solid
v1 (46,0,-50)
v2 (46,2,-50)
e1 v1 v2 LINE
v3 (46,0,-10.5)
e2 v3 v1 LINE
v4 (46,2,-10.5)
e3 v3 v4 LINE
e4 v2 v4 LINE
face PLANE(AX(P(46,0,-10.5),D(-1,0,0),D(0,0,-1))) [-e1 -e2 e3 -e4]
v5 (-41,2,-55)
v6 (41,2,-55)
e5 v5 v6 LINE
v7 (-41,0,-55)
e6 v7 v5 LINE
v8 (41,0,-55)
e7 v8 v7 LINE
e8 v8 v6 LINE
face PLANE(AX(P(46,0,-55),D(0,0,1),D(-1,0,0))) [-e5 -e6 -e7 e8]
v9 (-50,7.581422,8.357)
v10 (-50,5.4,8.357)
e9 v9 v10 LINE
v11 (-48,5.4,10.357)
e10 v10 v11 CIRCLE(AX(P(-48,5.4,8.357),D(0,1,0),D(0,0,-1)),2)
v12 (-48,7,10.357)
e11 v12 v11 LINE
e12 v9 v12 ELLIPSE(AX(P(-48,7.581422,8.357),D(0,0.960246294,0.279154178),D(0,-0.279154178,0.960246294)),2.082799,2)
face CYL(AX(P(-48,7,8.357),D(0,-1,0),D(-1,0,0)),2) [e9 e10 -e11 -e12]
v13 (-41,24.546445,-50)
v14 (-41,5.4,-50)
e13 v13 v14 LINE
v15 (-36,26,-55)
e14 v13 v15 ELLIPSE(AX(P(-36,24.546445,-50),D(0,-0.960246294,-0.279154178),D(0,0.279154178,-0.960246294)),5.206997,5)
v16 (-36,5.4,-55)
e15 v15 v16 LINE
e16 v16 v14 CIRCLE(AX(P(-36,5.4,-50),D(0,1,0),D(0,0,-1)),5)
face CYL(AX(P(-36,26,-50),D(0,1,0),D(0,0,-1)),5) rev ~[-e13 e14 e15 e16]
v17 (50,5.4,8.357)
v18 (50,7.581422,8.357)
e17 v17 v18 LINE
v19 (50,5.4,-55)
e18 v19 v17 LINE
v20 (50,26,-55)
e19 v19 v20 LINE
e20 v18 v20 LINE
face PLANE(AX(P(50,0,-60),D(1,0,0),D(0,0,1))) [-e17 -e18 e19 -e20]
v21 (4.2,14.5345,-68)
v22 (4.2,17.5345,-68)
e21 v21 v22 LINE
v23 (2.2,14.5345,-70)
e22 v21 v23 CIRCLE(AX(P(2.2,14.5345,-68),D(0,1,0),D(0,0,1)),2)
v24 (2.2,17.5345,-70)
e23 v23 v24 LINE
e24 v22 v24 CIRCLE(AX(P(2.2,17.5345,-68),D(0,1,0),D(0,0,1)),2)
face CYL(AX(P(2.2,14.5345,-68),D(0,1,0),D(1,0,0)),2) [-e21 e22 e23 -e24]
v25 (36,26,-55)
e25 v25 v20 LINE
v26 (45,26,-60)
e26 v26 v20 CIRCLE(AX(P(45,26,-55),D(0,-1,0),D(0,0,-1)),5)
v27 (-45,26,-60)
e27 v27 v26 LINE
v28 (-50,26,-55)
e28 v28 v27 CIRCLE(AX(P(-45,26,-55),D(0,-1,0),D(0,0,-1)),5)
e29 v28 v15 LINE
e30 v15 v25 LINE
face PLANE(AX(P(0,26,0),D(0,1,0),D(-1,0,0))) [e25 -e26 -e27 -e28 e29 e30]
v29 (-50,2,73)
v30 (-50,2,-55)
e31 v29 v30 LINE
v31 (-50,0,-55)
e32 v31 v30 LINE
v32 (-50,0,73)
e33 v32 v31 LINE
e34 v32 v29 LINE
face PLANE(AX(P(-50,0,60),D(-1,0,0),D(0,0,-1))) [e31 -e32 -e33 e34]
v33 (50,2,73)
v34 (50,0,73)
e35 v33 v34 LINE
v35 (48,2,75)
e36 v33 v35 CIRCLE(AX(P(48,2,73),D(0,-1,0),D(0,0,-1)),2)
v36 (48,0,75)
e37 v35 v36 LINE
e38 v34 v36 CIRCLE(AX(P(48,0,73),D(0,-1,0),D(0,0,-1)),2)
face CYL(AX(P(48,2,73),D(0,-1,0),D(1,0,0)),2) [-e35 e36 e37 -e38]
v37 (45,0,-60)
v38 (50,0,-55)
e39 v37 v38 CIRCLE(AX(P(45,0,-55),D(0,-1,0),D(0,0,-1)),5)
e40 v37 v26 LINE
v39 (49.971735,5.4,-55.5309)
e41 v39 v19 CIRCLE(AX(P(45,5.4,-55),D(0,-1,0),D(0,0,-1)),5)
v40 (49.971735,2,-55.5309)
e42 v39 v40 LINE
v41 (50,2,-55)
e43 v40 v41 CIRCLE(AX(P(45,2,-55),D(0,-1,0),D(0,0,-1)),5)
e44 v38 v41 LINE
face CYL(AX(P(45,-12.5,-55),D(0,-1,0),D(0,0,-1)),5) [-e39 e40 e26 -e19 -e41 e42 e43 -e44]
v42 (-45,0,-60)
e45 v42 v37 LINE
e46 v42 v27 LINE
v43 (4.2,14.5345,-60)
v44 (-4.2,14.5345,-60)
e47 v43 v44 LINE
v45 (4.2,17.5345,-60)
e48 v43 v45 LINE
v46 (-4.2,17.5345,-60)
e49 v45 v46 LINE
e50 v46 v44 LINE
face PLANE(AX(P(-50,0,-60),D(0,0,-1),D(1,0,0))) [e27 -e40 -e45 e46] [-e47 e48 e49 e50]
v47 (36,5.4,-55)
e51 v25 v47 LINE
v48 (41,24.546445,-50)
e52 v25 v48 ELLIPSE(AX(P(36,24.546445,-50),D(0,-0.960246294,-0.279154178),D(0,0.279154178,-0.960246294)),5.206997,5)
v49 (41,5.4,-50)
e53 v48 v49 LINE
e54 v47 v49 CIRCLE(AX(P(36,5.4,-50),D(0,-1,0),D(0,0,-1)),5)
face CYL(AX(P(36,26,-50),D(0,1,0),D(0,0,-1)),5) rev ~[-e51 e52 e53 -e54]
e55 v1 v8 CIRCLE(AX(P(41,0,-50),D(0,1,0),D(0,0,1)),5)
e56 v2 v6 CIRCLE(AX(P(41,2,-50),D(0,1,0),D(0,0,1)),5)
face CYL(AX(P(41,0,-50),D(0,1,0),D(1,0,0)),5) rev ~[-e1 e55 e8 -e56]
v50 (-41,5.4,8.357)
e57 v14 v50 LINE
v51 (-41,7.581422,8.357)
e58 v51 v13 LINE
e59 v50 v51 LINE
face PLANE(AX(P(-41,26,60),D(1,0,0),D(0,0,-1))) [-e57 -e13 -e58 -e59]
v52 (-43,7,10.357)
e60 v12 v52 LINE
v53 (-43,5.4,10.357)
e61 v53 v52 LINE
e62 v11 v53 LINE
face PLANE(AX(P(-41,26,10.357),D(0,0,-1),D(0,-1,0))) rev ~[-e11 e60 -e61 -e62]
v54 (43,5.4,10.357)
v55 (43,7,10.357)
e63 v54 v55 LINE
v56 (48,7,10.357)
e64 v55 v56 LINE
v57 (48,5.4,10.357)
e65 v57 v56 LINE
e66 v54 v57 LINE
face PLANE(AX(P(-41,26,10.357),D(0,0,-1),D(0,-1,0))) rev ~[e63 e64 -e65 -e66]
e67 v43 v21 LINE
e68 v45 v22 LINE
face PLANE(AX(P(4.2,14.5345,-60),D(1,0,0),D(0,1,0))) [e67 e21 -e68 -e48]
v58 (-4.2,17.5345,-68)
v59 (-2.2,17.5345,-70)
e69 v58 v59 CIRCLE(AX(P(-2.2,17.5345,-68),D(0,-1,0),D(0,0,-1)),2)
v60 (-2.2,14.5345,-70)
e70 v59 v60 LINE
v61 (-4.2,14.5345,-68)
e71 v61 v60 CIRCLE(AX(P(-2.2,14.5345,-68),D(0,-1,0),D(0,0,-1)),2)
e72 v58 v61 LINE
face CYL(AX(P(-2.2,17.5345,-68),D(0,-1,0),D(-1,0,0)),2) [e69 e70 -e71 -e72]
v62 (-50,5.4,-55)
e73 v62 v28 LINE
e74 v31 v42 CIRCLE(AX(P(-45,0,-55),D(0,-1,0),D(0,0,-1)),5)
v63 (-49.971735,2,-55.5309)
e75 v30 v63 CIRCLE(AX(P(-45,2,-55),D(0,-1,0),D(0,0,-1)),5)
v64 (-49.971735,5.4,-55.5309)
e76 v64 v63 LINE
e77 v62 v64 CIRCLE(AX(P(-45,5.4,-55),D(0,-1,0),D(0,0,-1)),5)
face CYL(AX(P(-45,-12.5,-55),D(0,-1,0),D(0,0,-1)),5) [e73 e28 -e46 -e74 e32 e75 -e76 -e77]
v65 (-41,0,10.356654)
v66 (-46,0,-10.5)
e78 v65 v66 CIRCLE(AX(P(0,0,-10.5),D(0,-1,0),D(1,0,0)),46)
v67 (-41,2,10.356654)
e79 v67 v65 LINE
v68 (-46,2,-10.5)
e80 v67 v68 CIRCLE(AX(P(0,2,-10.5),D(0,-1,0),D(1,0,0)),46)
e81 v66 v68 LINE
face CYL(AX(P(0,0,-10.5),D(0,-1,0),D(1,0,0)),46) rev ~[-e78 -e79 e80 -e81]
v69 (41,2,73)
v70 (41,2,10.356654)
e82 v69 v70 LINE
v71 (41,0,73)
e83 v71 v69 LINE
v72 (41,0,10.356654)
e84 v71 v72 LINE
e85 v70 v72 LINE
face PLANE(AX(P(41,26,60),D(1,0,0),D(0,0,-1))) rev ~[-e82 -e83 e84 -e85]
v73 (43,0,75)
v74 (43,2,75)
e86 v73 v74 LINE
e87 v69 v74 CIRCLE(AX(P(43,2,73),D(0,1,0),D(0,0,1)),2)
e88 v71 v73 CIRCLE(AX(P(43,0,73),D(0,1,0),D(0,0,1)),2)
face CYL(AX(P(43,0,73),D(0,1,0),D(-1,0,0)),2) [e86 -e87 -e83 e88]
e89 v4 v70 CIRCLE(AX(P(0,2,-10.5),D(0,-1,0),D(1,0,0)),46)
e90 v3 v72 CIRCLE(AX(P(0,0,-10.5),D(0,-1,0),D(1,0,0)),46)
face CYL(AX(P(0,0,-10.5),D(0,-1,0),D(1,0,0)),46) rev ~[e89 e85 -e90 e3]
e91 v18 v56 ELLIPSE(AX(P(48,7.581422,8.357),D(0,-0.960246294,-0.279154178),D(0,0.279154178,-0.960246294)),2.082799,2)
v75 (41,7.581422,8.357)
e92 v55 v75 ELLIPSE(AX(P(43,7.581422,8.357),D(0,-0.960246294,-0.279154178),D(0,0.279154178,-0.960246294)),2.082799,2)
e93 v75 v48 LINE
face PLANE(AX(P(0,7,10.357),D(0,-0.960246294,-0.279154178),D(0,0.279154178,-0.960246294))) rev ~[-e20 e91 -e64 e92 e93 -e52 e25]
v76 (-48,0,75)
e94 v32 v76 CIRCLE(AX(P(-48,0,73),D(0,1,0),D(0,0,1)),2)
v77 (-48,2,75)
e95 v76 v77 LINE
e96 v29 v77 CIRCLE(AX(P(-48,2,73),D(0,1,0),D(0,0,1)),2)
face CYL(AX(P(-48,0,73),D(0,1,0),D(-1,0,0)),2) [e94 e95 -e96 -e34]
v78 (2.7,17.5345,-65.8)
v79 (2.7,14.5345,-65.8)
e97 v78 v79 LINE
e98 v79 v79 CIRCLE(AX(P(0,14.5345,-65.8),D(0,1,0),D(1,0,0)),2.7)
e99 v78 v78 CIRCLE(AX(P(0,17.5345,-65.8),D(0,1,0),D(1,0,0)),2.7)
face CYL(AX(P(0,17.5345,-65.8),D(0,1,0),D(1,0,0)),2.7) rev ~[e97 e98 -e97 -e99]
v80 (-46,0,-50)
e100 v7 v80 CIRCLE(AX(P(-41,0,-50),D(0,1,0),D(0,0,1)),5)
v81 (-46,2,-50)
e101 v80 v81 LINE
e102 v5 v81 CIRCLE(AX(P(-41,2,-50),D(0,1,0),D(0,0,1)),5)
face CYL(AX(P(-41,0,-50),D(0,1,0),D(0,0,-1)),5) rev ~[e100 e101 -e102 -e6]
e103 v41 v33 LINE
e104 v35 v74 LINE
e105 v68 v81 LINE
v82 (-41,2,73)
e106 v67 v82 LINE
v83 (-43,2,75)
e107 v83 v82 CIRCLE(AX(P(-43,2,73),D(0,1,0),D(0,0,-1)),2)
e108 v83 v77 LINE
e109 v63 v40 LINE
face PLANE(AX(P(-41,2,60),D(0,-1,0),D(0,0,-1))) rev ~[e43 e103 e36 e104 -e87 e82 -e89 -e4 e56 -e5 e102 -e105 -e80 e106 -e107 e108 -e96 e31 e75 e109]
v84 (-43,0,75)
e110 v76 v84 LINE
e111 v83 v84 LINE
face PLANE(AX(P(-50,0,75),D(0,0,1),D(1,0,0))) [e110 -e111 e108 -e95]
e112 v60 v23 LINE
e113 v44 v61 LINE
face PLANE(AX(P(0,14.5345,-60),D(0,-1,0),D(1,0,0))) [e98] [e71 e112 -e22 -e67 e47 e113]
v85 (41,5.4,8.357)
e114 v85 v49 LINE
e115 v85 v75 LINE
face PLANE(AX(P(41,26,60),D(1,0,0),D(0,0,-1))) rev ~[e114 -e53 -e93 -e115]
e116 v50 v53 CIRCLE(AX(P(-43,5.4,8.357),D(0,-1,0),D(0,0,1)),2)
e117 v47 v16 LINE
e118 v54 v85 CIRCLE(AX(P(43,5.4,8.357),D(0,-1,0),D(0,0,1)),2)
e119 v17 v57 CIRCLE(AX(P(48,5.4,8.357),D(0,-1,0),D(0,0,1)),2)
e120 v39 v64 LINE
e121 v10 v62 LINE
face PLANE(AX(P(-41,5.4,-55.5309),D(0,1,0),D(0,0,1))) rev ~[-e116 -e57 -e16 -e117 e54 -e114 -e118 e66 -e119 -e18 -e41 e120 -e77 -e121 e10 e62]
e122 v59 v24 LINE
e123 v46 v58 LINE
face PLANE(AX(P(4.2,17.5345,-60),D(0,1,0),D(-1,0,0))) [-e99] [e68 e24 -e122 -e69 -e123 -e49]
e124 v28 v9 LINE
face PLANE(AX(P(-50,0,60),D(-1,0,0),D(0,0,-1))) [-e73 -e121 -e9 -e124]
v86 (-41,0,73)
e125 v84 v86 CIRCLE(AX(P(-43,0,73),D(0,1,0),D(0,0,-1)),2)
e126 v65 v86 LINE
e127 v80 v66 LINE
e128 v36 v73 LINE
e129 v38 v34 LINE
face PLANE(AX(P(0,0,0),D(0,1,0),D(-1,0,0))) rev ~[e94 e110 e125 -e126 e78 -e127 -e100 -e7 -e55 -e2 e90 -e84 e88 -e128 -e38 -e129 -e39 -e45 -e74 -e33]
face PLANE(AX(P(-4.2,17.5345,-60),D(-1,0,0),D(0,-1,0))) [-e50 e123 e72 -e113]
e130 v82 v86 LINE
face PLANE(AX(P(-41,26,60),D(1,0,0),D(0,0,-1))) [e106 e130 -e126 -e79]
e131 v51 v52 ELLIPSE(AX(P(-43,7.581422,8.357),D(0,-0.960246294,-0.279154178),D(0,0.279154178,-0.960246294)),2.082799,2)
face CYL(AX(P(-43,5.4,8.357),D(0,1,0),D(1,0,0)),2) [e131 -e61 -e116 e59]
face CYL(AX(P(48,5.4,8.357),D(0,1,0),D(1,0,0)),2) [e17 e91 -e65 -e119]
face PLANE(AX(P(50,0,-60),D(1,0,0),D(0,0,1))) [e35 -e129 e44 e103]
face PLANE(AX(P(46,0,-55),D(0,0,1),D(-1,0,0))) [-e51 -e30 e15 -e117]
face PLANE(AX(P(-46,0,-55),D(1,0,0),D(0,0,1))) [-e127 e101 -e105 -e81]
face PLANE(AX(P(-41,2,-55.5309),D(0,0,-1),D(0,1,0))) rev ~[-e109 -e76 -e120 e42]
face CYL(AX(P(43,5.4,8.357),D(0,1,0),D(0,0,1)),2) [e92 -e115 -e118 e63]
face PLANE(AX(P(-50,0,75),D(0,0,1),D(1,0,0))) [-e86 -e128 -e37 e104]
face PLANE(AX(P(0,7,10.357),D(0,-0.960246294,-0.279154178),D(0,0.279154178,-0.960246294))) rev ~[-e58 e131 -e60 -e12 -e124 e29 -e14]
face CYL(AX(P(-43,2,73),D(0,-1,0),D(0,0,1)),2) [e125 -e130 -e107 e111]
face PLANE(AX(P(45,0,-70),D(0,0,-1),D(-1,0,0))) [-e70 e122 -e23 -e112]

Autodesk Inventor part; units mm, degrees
ref_plane "YZ Plane" through (0, 0, 0) normal (1, 0, 0) x (0, 1, 0)
ref_plane "XZ Plane" through (0, 0, 0) normal (0, 1, 0) x (-1, 0, 0)
ref_plane "XY Plane" through (0, 0, 0) normal (0, 0, 1) x (1, 0, 0)
sketch "Sketch1" plane through (0, 0, 0) normal (0, 1, 0) x (-1, 0, 0)
  line L0 (50, -60) -> (-50, -60)
  line L1 (-50, -60) -> (-50, 60)
  line L2 (-50, 60) -> (50, 60)
  line L3 (50, 60) -> (50, -60)
  line L4 (50, -60) -> (-50, 60) construction
  line L5 (-50, -60) -> (50, 60) construction
  point P0 (0, 0)
  dimension "d0" = 100
  dimension "d1" = 120
extrude "Extrusion1" add sketch "Sketch1" along normal blind 26
sketch "Sketch2" plane through (0, 26, 0) normal (0, 1, 0) x (1, 0, 0)
  line L0 (-41, -60) -> (41, -60)
  line L1 (-50, -60) -> (50, -60) projected
  line L2 (41, -60) -> (41, -4.7988)
  line L3 (50, 60) -> (-50, 60) projected
  line L4 (-41, -60) -> (-41, 55)
  line L5 (-41, 55) -> (41, 55)
  line L6 (41, 55) -> (41, -4.7988)
  point P0 (0, 0)
  dimension "d23" = 115
extrude "Extrusion2" cut sketch "Sketch2" against normal through all
sketch "Sketch11" plane through (0, 0, 0) normal (0, -1, 0) x (1, 0, 0)
  arc A0 (46, -10.5) -> (-46, -10.5) centre (0, -10.5) ccw
  line L0 (41, -55) -> (-41, -55) projected
  line L1 (-46, -10.5) -> (46, -10.5)
  line L2 (46, -10.5) -> (46, -55)
  line L3 (46, -55) -> (-46, -55)
  line L4 (-46, -55) -> (-46, -10.5)
  point P0 (0, 0)
  dimension "d24" = 92
  dimension "d25" = 44.5
extrude "Extrusion7" cut sketch "Sketch11" against normal blind 5.4
sketch "Sketch13" plane through (-41, 26, 60) normal (1, 0, 0) x (0, 0, -1)
  line L0 (0, -26) -> (0, 0) projected
  line L1 (0, -24) -> (115.5309, -24)
  line L2 (115.5309, -24) -> (115.5309, -20.6)
  line L3 (115.5309, -20.6) -> (0, -20.6)
  line L4 (0, -20.6) -> (0, -24)
  line L5 (49.6433, -26) -> (0, -26) projected
  point P0 (60, -26)
  point P1 (0, -20.6)
  dimension "d48" = 115.5309
  dimension "d49" = 3.4
  dimension "d50" = 2
extrude "Extrusion8" cut sketch "Sketch13" against normal through all both and the other way through all
sketch "Sketch14" plane through (-41, 26, 60) normal (1, 0, 0) x (0, 0, -1)
  line L0 (0, -20.6) -> (0, 0) projected
  line L1 (0, 0) -> (49.643, 0)
  line L2 (49.643, 0) -> (49.643, -20.6)
  line L3 (49.643, -20.6) -> (0, -20.6)
  line L4 (0, -20.6) -> (0, 0)
  point P0 (60, -26)
  dimension "d51" = 20.6
  dimension "d52" = 49.643
extrude "Extrusion9" cut sketch "Sketch14" along normal through all both and the other way through all
sketch "Sketch15" plane through (0, 0, 0) normal (1, 0, 0) x (0, 1, 0)
  line L0 (26, -55) -> (5.4, -55) projected
  line L1 (7, 10.357) -> (26, -55)
  line L2 (26, -55) -> (26, 10.357)
  line L3 (26, 10.357) -> (7, 10.357)
  point P0 (0, 0)
  dimension "d53" = 65.357
  dimension "d54" = 19
extrude "Extrusion10" cut sketch "Sketch15" against normal through all both and the other way through all
fillet "Fillet1" radius 5 4 edges at (-41, 15.7, -55) (50, 13, -60) (-50, 13, -60) (41, 15.7, -55)
fillet "Fillet2" radius 5 2 edges at (-46, 1, -55) (46, 1, -55)
sketch "Sketch16" plane through (45, 0, -60) normal (0, 0, -1) x (-1, 0, 0)
  line L0 (45, 0) -> (45, 26)
  line L1 (81, 26) -> (9, 26) projected
  line L2 (40.8, 17.5345) -> (49.2, 17.5345)
  line L3 (49.2, 17.5345) -> (49.2, 14.5345)
  line L4 (49.2, 14.5345) -> (40.8, 14.5345)
  line L5 (40.8, 14.5345) -> (40.8, 17.5345)
  line L6 (40.8, 17.5345) -> (49.2, 14.5345) construction
  line L7 (49.2, 17.5345) -> (40.8, 14.5345) construction
  point P0 (45, 16.0345)
  dimension "d38" = 8.4
  dimension "d39" = 3
extrude "Extrusion11" add sketch "Sketch16" along normal blind 10
sketch "Sketch17" plane through (-4.2, 17.5345, -60) normal (0, 1, 0) x (1, 0, 0)
  circle A0 centre (4.2, 5.8) radius 2.7
  line L0 (0, 0) -> (0, 10) projected
  line L1 (0, 10) -> (8.4, 10) projected
  point P0 (4.2, -60)
  dimension "d42" = 5.4
  dimension "d43" = 4.2
  dimension "d44" = 4.2
extrude "Extrusion12" cut sketch "Sketch17" against normal through all
fillet "Fillet5" radius 2 2 edges at (-4.2, 16.0345, -70) (4.2, 16.0345, -70)
sketch "Sketch18" plane through (45, 0, -60) normal (0, 0, -1) x (-1, 0, 0)
  point P0 (45, 0)
sketch "Sketch19" plane through (-50, 5.4, -55) normal (-1, 0, 0) x (0, 0, 1)
  point P0 (55, -5.4)
sketch "Sketch20" plane through (-50, 0, 60) normal (0, 0, 1) x (1, 0, 0)
  line L0 (9, 2) -> (0, 2) projected
  line L1 (0, 0) -> (9, 0) projected
  line L2 (0, 2) -> (9, 2)
  line L3 (9, 2) -> (9, 0)
  line L4 (9, 0) -> (0, 0)
  line L5 (0, 0) -> (0, 2)
  line L6 (100, 0) -> (95, 0) projected
  line L7 (100, 2) -> (91, 2) projected
  line L8 (100, 0) -> (91, 0)
  line L9 (91, 0) -> (91, 2)
  line L10 (91, 2) -> (100, 2)
  line L11 (100, 2) -> (100, 0)
  point P0 (50, 0)
extrude "Extrusion13" add sketch "Sketch20" along normal blind 15
fillet "Fillet7" radius 2 4 edges at (-41, 6.2, 10.357) (-50, 6.2, 10.357) (50, 6.2, 10.357) (41, 6.2, 10.357)
fillet "Fillet8" radius 2 4 edges at (50, 1, 75) (41, 1, 75) (-41, 1, 75) (-50, 1, 75)
properties part number "Khay gạt cốc"
